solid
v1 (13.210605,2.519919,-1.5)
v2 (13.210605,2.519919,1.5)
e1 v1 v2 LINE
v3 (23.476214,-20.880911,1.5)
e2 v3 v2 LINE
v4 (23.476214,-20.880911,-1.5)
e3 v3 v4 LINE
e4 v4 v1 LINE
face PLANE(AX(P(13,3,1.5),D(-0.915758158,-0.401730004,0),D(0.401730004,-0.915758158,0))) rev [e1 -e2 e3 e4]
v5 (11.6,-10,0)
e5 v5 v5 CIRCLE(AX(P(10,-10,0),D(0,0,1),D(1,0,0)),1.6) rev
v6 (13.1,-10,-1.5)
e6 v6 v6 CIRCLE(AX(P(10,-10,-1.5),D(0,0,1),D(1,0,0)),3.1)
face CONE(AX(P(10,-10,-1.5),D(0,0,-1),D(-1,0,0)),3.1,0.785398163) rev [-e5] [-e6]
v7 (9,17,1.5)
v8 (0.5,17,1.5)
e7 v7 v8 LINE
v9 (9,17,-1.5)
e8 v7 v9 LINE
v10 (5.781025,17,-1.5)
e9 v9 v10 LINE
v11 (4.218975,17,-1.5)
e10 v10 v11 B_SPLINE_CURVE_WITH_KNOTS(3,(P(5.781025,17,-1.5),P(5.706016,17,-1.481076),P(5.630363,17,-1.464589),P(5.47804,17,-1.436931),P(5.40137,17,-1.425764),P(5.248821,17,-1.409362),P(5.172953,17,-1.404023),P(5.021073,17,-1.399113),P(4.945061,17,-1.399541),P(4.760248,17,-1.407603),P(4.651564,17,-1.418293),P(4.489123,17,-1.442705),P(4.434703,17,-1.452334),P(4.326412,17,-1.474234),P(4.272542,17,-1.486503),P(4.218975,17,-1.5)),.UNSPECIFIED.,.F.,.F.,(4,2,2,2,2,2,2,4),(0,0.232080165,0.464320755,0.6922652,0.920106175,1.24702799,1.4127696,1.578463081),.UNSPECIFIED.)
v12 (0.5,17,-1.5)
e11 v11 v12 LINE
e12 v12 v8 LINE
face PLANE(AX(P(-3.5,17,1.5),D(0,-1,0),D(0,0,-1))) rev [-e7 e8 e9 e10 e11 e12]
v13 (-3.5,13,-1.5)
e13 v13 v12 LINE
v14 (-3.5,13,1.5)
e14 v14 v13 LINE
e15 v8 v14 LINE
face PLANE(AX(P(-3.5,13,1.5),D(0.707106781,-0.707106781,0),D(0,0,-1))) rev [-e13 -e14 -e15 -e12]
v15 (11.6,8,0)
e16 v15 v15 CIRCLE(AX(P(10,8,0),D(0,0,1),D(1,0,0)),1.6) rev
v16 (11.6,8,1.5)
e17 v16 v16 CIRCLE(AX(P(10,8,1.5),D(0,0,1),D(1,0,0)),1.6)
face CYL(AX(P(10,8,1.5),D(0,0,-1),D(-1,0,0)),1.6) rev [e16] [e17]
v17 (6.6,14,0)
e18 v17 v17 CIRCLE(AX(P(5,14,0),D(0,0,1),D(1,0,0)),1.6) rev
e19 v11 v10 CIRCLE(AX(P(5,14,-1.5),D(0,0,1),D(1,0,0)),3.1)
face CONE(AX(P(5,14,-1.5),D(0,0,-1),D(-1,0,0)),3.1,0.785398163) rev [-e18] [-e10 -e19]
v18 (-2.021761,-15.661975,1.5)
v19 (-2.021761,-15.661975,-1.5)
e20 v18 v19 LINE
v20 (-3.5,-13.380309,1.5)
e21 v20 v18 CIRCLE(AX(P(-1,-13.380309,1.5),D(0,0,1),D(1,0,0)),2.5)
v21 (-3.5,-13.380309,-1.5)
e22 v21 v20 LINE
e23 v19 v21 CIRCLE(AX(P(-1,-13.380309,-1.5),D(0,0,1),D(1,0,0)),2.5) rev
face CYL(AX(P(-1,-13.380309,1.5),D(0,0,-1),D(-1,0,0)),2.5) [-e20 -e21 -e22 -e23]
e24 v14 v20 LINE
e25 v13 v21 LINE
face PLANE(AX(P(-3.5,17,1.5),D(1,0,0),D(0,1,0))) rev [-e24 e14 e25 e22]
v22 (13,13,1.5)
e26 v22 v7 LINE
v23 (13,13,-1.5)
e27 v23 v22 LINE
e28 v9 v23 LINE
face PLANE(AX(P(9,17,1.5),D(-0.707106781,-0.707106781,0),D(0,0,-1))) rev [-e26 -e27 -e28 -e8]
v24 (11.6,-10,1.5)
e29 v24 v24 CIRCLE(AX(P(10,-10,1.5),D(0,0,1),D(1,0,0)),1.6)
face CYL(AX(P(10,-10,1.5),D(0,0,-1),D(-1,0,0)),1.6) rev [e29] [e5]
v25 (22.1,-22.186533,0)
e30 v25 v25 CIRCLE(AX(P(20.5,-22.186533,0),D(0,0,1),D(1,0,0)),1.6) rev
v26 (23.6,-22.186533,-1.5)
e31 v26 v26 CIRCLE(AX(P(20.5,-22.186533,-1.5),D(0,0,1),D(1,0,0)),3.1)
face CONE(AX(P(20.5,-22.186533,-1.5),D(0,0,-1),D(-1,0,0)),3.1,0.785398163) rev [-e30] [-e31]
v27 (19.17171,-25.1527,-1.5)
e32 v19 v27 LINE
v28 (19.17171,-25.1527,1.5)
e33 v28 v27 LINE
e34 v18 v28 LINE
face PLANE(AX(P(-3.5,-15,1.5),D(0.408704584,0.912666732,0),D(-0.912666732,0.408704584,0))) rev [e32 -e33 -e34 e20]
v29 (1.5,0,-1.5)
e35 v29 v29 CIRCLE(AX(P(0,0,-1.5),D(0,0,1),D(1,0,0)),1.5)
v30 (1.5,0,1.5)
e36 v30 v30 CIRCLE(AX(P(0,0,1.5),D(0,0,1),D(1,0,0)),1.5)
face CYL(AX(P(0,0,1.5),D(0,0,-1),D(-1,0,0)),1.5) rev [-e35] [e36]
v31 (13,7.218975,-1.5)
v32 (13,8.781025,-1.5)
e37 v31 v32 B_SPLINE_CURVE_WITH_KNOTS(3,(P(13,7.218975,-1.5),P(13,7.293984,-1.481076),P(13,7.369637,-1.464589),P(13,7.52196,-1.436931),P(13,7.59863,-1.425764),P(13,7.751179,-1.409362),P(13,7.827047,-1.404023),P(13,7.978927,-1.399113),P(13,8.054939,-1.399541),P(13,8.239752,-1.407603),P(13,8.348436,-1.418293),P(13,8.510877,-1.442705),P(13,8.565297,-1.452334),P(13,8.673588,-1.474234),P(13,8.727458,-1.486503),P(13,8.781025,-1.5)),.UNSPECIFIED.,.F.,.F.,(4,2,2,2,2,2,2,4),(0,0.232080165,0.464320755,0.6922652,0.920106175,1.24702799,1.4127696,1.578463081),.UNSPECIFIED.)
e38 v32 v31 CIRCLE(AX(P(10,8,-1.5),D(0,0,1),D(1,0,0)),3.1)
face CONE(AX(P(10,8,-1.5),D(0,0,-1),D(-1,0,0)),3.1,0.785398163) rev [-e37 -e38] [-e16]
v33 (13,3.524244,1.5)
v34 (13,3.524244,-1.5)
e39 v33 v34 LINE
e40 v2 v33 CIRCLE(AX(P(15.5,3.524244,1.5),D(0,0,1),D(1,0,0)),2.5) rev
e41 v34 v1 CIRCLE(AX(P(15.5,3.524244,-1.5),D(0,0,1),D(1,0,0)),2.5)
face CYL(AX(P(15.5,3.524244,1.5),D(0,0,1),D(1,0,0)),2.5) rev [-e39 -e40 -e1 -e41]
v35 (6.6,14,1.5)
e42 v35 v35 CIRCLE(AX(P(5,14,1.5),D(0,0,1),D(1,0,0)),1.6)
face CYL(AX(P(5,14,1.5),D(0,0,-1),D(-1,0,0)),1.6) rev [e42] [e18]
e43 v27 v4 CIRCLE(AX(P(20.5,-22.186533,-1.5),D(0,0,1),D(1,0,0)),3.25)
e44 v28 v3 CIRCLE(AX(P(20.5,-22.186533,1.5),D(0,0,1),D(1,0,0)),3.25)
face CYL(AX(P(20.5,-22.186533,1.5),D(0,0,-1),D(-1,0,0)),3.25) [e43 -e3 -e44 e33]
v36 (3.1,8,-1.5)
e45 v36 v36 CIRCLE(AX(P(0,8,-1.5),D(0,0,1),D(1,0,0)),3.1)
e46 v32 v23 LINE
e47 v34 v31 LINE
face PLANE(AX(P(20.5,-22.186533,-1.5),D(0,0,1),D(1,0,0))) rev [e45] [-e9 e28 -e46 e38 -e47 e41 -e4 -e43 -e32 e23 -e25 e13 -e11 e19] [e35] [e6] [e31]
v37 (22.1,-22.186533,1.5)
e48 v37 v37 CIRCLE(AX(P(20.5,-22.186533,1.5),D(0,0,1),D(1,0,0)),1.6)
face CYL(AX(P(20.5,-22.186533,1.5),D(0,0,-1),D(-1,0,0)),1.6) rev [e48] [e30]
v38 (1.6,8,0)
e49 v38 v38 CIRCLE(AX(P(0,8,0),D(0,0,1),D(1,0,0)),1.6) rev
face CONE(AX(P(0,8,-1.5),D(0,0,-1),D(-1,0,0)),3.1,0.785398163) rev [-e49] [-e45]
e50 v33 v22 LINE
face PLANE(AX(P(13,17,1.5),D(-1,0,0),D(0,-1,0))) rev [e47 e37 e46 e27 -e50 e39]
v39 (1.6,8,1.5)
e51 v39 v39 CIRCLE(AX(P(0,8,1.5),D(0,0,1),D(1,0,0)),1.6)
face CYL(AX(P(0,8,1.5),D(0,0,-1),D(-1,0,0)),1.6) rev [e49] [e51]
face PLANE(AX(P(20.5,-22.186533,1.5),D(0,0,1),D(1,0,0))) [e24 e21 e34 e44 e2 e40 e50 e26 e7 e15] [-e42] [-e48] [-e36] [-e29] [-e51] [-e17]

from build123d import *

# Parameters (mm, degrees)
SKETCH_1_R      = 1.5
SKETCH_1_R_2    = 1.6
EXTRUDE_1_DEPTH = 1.5
CHAMFER_1_SIZE  = 1.5
FILLET_1_R      = 2.5
CHAMFER_2_SIZE  = 4


with BuildPart() as part:
    # 草图1 → 凸台-拉伸1 (new, symmetric)
    with BuildSketch(Plane.XY):
        with BuildLine():
            Line((-3.5, 17), (-3.5, -15))
            Line((-3.5, -15), (19.171710101, -25.152700357))
            ThreePointArc((19.171710101, -25.152700357), (22.789314225, -24.493379894), (23.476214014, -20.880910968))
            Line((23.476214014, -20.880910968), (13, 3))
            Line((13, 3), (13, 17))
            Line((13, 17), (-3.5, 17))
        make_face()
        Circle(SKETCH_1_R, mode=Mode.SUBTRACT)
        with Locations((10, -10)):
            Circle(SKETCH_1_R_2, mode=Mode.SUBTRACT)
        with Locations((20.5, -22.186533479)):
            Circle(SKETCH_1_R_2, mode=Mode.SUBTRACT)
        with Locations((0, 8)):
            Circle(SKETCH_1_R_2, mode=Mode.SUBTRACT)
        with Locations((10, 8)):
            Circle(SKETCH_1_R_2, mode=Mode.SUBTRACT)
        with Locations((5, 14)):
            Circle(SKETCH_1_R_2, mode=Mode.SUBTRACT)
    extrude(amount=EXTRUDE_1_DEPTH, both=True)

    # 倒角1
    # the kernel refuses this chamfer: 1.5 mm, written as the material it takes off along each edge
    with BuildSketch(Plane(origin=(10, -10, -1.5), x_dir=(1, 0, 0), z_dir=(0, -1, 0))) as chamfer_1_piece_1:
        Polygon((1.6, CHAMFER_1_SIZE), (1.6 + CHAMFER_1_SIZE, 0), (1.6, 0), align=None)
    revolve(axis=Axis((10, -10, -1.5), (0, 0, 1)), mode=Mode.SUBTRACT)
    with BuildSketch(Plane(origin=(20.5, -22.186533479, -1.5), x_dir=(1, 0, 0), z_dir=(0, -1, 0))) as chamfer_1_piece_2:
        Polygon((1.6, CHAMFER_1_SIZE), (1.6 + CHAMFER_1_SIZE, 0), (1.6, 0), align=None)
    revolve(axis=Axis((20.5, -22.186533479, -1.5), (0, 0, 1)), mode=Mode.SUBTRACT)
    with BuildSketch(Plane(origin=(0, 8, -1.5), x_dir=(1, 0, 0), z_dir=(0, -1, 0))) as chamfer_1_piece_3:
        Polygon((1.6, CHAMFER_1_SIZE), (1.6 + CHAMFER_1_SIZE, 0), (1.6, 0), align=None)
    revolve(axis=Axis((0, 8, -1.5), (0, 0, 1)), mode=Mode.SUBTRACT)
    with BuildSketch(Plane(origin=(10, 8, -1.5), x_dir=(1, 0, 0), z_dir=(0, -1, 0))) as chamfer_1_piece_4:
        Polygon((1.6, CHAMFER_1_SIZE), (1.6 + CHAMFER_1_SIZE, 0), (1.6, 0), align=None)
    revolve(axis=Axis((10, 8, -1.5), (0, 0, 1)), mode=Mode.SUBTRACT)
    with BuildSketch(Plane(origin=(5, 14, -1.5), x_dir=(1, 0, 0), z_dir=(0, -1, 0))) as chamfer_1_piece_5:
        Polygon((1.6, CHAMFER_1_SIZE), (1.6 + CHAMFER_1_SIZE, 0), (1.6, 0), align=None)
    revolve(axis=Axis((5, 14, -1.5), (0, 0, 1)), mode=Mode.SUBTRACT)

    # 圆角1
    fillet_1_edges = [part.edges().sort_by_distance(p)[0] for p in [
        (13, 3, 0),
        (-3.5, -15, 0),
    ]]
    fillet(fillet_1_edges, radius=FILLET_1_R)

    # 倒角2
    chamfer_2_edges = [part.edges().sort_by_distance(p)[0] for p in [
        (13, 17, 0),
        (-3.5, 17, 0),
    ]]
    chamfer(chamfer_2_edges, length=CHAMFER_2_SIZE)


solid = part.part
